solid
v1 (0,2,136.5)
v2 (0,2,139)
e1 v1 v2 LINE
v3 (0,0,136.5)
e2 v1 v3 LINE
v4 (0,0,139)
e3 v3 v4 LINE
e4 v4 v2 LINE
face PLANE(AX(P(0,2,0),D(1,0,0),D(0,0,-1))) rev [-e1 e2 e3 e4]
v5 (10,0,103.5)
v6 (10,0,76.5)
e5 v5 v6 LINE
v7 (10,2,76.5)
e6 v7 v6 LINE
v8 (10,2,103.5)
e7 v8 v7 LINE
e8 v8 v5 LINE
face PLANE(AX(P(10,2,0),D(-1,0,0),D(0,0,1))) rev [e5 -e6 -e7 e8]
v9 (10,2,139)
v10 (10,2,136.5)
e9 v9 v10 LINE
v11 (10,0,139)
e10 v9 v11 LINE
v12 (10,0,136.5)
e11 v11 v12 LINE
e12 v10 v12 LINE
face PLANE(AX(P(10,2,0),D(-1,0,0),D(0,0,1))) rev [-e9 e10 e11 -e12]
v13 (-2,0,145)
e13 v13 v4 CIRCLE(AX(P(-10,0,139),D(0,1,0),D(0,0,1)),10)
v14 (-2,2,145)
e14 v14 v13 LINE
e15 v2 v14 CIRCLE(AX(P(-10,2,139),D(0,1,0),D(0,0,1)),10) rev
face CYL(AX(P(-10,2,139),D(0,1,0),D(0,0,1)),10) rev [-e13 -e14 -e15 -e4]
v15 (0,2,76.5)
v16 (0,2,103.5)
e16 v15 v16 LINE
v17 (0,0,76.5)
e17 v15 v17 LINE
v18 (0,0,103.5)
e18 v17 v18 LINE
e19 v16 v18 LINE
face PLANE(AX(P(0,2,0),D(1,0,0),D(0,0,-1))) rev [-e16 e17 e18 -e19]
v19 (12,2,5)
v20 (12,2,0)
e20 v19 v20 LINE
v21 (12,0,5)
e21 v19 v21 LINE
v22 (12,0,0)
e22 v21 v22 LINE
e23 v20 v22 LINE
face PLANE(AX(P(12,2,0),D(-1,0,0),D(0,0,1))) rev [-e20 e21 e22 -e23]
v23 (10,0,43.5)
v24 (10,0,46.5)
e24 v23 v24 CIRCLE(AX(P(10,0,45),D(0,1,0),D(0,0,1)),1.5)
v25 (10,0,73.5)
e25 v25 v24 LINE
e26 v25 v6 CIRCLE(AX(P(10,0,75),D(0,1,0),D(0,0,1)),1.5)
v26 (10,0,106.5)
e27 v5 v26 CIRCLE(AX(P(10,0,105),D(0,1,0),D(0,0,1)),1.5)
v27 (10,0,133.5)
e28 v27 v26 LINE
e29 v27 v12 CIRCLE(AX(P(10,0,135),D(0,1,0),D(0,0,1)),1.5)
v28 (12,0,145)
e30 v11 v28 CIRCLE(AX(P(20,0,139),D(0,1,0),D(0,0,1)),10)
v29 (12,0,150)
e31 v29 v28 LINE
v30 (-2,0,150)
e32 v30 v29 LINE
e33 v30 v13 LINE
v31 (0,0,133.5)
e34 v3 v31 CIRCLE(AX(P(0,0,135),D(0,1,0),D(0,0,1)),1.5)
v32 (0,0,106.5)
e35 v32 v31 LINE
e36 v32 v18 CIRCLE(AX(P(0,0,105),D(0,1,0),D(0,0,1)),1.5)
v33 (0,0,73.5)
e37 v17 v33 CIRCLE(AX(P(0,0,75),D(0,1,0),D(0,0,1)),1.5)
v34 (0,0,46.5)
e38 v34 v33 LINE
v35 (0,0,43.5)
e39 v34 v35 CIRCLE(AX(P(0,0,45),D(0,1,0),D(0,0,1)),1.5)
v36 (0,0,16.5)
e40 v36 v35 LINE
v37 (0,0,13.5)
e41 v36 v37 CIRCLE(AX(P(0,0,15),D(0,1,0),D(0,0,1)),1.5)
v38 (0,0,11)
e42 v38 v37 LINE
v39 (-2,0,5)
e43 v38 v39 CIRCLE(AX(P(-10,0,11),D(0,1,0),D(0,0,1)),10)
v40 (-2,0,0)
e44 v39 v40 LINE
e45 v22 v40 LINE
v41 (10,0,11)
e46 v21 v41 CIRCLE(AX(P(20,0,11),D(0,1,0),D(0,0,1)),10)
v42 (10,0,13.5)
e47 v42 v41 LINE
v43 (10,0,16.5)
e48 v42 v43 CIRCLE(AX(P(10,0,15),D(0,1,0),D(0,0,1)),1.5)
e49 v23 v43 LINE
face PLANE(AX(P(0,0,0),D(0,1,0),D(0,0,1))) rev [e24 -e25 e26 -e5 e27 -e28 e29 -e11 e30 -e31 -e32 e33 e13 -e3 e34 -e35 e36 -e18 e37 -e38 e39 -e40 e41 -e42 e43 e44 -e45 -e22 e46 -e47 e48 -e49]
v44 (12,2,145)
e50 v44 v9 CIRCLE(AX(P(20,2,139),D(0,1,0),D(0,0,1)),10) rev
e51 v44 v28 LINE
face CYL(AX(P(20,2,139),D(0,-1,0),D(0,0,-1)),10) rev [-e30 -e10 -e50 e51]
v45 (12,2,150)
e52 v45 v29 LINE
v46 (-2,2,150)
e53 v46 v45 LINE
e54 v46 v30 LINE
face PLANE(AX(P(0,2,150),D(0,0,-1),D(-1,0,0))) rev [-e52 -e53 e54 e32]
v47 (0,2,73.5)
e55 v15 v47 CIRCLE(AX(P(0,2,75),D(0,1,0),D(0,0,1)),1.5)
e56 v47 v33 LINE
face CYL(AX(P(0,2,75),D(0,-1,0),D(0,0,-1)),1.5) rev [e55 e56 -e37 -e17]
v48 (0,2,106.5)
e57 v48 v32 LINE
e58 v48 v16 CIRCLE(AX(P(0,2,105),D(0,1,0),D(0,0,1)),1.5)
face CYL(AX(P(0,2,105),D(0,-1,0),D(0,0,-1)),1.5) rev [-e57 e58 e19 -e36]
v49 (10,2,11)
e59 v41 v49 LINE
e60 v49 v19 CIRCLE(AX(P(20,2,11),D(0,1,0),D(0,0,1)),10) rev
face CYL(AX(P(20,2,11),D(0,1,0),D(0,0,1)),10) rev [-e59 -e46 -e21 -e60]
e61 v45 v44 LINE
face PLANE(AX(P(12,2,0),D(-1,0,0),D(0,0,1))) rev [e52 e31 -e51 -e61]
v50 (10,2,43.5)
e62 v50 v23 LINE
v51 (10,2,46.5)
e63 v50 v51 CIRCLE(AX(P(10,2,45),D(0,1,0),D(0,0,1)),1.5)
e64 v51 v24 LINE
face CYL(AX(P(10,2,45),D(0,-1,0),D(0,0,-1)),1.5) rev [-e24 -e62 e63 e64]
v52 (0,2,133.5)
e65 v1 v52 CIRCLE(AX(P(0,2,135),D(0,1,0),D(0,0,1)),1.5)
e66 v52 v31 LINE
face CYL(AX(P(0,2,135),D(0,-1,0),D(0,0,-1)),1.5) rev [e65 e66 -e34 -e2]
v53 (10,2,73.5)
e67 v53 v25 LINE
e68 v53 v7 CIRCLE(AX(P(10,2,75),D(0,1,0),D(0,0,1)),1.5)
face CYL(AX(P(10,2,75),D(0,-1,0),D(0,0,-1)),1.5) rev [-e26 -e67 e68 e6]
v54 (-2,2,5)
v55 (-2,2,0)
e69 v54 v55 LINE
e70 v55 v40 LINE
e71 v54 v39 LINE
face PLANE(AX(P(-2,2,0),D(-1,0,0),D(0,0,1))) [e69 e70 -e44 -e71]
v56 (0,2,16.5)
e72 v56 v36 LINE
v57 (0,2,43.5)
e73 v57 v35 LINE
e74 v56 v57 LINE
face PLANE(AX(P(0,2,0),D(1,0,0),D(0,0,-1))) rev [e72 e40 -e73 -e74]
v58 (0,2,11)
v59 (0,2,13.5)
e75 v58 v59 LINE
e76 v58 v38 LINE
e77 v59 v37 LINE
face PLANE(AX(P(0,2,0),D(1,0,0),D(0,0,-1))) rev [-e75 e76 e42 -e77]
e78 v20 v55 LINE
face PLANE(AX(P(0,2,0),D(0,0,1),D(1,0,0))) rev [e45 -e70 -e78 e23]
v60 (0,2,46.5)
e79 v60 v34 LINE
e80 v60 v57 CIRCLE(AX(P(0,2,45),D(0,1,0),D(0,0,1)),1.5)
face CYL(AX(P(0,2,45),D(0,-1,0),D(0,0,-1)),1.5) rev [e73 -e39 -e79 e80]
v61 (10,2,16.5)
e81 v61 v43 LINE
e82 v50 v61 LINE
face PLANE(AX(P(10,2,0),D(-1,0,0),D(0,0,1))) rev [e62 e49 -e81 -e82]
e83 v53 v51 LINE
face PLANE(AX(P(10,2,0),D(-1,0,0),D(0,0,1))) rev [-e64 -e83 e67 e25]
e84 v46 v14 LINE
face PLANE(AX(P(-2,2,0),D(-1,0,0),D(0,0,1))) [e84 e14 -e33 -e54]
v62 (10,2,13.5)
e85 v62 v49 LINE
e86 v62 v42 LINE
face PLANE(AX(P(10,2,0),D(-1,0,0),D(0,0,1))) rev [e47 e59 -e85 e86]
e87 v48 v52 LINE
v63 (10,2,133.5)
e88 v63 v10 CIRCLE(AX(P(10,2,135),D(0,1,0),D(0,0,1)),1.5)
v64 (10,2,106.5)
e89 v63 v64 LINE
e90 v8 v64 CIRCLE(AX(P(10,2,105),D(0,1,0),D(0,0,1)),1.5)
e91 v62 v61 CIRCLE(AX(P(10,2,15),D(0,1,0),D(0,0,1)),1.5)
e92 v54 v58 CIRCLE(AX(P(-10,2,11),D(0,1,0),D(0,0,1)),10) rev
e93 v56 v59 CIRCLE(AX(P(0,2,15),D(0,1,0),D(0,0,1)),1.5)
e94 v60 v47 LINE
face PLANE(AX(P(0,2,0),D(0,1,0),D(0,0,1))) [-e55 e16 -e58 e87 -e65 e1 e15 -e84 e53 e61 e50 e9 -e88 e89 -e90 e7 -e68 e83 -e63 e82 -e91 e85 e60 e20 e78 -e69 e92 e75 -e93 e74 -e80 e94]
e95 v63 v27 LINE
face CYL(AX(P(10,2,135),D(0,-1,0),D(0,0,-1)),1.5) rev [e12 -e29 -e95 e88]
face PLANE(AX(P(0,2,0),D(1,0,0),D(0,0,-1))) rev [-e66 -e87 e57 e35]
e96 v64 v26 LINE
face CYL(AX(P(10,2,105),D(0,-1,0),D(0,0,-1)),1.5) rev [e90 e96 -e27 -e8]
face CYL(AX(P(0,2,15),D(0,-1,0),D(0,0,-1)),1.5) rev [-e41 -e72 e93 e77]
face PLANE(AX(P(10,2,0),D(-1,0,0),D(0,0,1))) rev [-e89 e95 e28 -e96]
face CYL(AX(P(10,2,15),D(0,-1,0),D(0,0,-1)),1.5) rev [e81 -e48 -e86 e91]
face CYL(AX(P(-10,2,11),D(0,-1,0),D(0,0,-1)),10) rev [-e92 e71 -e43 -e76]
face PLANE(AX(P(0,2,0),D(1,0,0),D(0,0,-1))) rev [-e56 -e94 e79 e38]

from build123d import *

# Parameters (mm, degrees)
SKETCH_1_W      = 2
SKETCH_1_H      = 5
EXTRUDE_1_DEPTH = 2
FILLET_1_R      = 10


with BuildPart() as part:
    # 草图1 → 凸台-拉伸1 (new body)
    with BuildSketch(Plane(origin=(0, 0, 0), x_dir=(1, 0, 0), z_dir=(0, 1, 0))):
        with BuildLine():
            Line((10, 0), (0, 0))
            Line((0, 0), (0, -5))
            Line((0, -5), (0, -13.5))
            ThreePointArc((0, -13.5), (1.060660172, -13.939339828), (1.5, -15))
            ThreePointArc((1.5, -15), (1.060660172, -16.060660172), (0, -16.5))
            Line((0, -16.5), (0, -43.5))
            ThreePointArc((0, -43.5), (1.060660172, -43.939339828), (1.5, -45))
            ThreePointArc((1.5, -45), (1.060660172, -46.060660172), (0, -46.5))
            Line((0, -46.5), (0, -73.5))
            ThreePointArc((0, -73.5), (1.060660172, -73.939339828), (1.5, -75))
            Line((1.5, -75), (2.5, -75))
            Line((2.5, -75), (2.5, -72.5))
            Line((2.5, -72.5), (7.5, -72.5))
            Line((7.5, -72.5), (7.5, -75))
            Line((7.5, -75), (8.5, -75))
            ThreePointArc((8.5, -75), (8.939339828, -73.939339828), (10, -73.5))
            Line((10, -73.5), (10, -46.5))
            ThreePointArc((10, -46.5), (8.5, -45), (10, -43.5))
            Line((10, -43.5), (10, -16.5))
            ThreePointArc((10, -16.5), (8.5, -15), (10, -13.5))
            Line((10, -13.5), (10, -5))
            Line((10, -5), (10, 0))
        make_face()
        Polygon((2.5, -72.5), (2.5, -75), (5, -75), (7.5, -75), (7.5, -72.5), align=None)
        Polygon((5, -75), (2.5, -75), (2.5, -77.5), (7.5, -77.5), (7.5, -75), align=None)
        with BuildLine():
            Line((2.5, -75), (1.5, -75))
            ThreePointArc((1.5, -75), (1.060660172, -76.060660172), (0, -76.5))
            Line((0, -76.5), (0, -103.5))
            ThreePointArc((0, -103.5), (1.060660172, -103.939339828), (1.5, -105))
            ThreePointArc((1.5, -105), (1.060660172, -106.060660172), (0, -106.5))
            Line((0, -106.5), (0, -133.5))
            ThreePointArc((0, -133.5), (1.060660172, -133.939339828), (1.5, -135))
            ThreePointArc((1.5, -135), (1.060660172, -136.060660172), (0, -136.5))
            Line((0, -136.5), (0, -145))
            Line((0, -145), (0, -150))
            Line((0, -150), (10, -150))
            Line((10, -150), (10, -145))
            Line((10, -145), (10, -136.5))
            ThreePointArc((10, -136.5), (8.5, -135), (10, -133.5))
            Line((10, -133.5), (10, -106.5))
            ThreePointArc((10, -106.5), (8.5, -105), (10, -103.5))
            Line((10, -103.5), (10, -76.5))
            ThreePointArc((10, -76.5), (8.939339828, -76.060660172), (8.5, -75))
            Line((8.5, -75), (7.5, -75))
            Line((7.5, -75), (7.5, -77.5))
            Line((7.5, -77.5), (2.5, -77.5))
            Line((2.5, -77.5), (2.5, -75))
        make_face()
        with Locations((11, -147.5)):
            Rectangle(SKETCH_1_W, SKETCH_1_H)
        with Locations((-1, -147.5)):
            Rectangle(SKETCH_1_W, SKETCH_1_H)
        with Locations((11, -2.5)):
            Rectangle(SKETCH_1_W, SKETCH_1_H)
        with Locations((-1, -2.5)):
            Rectangle(SKETCH_1_W, SKETCH_1_H)
    extrude(amount=EXTRUDE_1_DEPTH)

    # 圆角1
    # the kernel refuses this fillet: 10 mm, written as the material it adds along each edge
    with BuildSketch(Plane(origin=(10, 0, 145), x_dir=(0, 0, -1), z_dir=(0, 1, 0)), Plane(origin=(0, 0, 5), x_dir=(0, 0, 1), z_dir=(0, 1, 0))) as fillet_1_piece_1:
        with BuildLine():
            CenterArc((6, -10), FILLET_1_R, 90, 36.869897646)
            Line((0, -2), (0, 0))
            Line((0, 0), (6, 0))
        make_face()
    extrude(amount=2)
    with BuildSketch(Plane(origin=(0, 0, 145), x_dir=(-1, 0, 0), z_dir=(0, 1, 0)), Plane(origin=(10, 0, 5), x_dir=(1, 0, 0), z_dir=(0, 1, 0))) as fillet_1_piece_2:
        with BuildLine():
            CenterArc((10, -6), FILLET_1_R, 143.130102354, 36.869897646)
            Line((0, -6), (0, 0))
            Line((0, 0), (2, 0))
        make_face()
    extrude(amount=2)


solid = part.part
